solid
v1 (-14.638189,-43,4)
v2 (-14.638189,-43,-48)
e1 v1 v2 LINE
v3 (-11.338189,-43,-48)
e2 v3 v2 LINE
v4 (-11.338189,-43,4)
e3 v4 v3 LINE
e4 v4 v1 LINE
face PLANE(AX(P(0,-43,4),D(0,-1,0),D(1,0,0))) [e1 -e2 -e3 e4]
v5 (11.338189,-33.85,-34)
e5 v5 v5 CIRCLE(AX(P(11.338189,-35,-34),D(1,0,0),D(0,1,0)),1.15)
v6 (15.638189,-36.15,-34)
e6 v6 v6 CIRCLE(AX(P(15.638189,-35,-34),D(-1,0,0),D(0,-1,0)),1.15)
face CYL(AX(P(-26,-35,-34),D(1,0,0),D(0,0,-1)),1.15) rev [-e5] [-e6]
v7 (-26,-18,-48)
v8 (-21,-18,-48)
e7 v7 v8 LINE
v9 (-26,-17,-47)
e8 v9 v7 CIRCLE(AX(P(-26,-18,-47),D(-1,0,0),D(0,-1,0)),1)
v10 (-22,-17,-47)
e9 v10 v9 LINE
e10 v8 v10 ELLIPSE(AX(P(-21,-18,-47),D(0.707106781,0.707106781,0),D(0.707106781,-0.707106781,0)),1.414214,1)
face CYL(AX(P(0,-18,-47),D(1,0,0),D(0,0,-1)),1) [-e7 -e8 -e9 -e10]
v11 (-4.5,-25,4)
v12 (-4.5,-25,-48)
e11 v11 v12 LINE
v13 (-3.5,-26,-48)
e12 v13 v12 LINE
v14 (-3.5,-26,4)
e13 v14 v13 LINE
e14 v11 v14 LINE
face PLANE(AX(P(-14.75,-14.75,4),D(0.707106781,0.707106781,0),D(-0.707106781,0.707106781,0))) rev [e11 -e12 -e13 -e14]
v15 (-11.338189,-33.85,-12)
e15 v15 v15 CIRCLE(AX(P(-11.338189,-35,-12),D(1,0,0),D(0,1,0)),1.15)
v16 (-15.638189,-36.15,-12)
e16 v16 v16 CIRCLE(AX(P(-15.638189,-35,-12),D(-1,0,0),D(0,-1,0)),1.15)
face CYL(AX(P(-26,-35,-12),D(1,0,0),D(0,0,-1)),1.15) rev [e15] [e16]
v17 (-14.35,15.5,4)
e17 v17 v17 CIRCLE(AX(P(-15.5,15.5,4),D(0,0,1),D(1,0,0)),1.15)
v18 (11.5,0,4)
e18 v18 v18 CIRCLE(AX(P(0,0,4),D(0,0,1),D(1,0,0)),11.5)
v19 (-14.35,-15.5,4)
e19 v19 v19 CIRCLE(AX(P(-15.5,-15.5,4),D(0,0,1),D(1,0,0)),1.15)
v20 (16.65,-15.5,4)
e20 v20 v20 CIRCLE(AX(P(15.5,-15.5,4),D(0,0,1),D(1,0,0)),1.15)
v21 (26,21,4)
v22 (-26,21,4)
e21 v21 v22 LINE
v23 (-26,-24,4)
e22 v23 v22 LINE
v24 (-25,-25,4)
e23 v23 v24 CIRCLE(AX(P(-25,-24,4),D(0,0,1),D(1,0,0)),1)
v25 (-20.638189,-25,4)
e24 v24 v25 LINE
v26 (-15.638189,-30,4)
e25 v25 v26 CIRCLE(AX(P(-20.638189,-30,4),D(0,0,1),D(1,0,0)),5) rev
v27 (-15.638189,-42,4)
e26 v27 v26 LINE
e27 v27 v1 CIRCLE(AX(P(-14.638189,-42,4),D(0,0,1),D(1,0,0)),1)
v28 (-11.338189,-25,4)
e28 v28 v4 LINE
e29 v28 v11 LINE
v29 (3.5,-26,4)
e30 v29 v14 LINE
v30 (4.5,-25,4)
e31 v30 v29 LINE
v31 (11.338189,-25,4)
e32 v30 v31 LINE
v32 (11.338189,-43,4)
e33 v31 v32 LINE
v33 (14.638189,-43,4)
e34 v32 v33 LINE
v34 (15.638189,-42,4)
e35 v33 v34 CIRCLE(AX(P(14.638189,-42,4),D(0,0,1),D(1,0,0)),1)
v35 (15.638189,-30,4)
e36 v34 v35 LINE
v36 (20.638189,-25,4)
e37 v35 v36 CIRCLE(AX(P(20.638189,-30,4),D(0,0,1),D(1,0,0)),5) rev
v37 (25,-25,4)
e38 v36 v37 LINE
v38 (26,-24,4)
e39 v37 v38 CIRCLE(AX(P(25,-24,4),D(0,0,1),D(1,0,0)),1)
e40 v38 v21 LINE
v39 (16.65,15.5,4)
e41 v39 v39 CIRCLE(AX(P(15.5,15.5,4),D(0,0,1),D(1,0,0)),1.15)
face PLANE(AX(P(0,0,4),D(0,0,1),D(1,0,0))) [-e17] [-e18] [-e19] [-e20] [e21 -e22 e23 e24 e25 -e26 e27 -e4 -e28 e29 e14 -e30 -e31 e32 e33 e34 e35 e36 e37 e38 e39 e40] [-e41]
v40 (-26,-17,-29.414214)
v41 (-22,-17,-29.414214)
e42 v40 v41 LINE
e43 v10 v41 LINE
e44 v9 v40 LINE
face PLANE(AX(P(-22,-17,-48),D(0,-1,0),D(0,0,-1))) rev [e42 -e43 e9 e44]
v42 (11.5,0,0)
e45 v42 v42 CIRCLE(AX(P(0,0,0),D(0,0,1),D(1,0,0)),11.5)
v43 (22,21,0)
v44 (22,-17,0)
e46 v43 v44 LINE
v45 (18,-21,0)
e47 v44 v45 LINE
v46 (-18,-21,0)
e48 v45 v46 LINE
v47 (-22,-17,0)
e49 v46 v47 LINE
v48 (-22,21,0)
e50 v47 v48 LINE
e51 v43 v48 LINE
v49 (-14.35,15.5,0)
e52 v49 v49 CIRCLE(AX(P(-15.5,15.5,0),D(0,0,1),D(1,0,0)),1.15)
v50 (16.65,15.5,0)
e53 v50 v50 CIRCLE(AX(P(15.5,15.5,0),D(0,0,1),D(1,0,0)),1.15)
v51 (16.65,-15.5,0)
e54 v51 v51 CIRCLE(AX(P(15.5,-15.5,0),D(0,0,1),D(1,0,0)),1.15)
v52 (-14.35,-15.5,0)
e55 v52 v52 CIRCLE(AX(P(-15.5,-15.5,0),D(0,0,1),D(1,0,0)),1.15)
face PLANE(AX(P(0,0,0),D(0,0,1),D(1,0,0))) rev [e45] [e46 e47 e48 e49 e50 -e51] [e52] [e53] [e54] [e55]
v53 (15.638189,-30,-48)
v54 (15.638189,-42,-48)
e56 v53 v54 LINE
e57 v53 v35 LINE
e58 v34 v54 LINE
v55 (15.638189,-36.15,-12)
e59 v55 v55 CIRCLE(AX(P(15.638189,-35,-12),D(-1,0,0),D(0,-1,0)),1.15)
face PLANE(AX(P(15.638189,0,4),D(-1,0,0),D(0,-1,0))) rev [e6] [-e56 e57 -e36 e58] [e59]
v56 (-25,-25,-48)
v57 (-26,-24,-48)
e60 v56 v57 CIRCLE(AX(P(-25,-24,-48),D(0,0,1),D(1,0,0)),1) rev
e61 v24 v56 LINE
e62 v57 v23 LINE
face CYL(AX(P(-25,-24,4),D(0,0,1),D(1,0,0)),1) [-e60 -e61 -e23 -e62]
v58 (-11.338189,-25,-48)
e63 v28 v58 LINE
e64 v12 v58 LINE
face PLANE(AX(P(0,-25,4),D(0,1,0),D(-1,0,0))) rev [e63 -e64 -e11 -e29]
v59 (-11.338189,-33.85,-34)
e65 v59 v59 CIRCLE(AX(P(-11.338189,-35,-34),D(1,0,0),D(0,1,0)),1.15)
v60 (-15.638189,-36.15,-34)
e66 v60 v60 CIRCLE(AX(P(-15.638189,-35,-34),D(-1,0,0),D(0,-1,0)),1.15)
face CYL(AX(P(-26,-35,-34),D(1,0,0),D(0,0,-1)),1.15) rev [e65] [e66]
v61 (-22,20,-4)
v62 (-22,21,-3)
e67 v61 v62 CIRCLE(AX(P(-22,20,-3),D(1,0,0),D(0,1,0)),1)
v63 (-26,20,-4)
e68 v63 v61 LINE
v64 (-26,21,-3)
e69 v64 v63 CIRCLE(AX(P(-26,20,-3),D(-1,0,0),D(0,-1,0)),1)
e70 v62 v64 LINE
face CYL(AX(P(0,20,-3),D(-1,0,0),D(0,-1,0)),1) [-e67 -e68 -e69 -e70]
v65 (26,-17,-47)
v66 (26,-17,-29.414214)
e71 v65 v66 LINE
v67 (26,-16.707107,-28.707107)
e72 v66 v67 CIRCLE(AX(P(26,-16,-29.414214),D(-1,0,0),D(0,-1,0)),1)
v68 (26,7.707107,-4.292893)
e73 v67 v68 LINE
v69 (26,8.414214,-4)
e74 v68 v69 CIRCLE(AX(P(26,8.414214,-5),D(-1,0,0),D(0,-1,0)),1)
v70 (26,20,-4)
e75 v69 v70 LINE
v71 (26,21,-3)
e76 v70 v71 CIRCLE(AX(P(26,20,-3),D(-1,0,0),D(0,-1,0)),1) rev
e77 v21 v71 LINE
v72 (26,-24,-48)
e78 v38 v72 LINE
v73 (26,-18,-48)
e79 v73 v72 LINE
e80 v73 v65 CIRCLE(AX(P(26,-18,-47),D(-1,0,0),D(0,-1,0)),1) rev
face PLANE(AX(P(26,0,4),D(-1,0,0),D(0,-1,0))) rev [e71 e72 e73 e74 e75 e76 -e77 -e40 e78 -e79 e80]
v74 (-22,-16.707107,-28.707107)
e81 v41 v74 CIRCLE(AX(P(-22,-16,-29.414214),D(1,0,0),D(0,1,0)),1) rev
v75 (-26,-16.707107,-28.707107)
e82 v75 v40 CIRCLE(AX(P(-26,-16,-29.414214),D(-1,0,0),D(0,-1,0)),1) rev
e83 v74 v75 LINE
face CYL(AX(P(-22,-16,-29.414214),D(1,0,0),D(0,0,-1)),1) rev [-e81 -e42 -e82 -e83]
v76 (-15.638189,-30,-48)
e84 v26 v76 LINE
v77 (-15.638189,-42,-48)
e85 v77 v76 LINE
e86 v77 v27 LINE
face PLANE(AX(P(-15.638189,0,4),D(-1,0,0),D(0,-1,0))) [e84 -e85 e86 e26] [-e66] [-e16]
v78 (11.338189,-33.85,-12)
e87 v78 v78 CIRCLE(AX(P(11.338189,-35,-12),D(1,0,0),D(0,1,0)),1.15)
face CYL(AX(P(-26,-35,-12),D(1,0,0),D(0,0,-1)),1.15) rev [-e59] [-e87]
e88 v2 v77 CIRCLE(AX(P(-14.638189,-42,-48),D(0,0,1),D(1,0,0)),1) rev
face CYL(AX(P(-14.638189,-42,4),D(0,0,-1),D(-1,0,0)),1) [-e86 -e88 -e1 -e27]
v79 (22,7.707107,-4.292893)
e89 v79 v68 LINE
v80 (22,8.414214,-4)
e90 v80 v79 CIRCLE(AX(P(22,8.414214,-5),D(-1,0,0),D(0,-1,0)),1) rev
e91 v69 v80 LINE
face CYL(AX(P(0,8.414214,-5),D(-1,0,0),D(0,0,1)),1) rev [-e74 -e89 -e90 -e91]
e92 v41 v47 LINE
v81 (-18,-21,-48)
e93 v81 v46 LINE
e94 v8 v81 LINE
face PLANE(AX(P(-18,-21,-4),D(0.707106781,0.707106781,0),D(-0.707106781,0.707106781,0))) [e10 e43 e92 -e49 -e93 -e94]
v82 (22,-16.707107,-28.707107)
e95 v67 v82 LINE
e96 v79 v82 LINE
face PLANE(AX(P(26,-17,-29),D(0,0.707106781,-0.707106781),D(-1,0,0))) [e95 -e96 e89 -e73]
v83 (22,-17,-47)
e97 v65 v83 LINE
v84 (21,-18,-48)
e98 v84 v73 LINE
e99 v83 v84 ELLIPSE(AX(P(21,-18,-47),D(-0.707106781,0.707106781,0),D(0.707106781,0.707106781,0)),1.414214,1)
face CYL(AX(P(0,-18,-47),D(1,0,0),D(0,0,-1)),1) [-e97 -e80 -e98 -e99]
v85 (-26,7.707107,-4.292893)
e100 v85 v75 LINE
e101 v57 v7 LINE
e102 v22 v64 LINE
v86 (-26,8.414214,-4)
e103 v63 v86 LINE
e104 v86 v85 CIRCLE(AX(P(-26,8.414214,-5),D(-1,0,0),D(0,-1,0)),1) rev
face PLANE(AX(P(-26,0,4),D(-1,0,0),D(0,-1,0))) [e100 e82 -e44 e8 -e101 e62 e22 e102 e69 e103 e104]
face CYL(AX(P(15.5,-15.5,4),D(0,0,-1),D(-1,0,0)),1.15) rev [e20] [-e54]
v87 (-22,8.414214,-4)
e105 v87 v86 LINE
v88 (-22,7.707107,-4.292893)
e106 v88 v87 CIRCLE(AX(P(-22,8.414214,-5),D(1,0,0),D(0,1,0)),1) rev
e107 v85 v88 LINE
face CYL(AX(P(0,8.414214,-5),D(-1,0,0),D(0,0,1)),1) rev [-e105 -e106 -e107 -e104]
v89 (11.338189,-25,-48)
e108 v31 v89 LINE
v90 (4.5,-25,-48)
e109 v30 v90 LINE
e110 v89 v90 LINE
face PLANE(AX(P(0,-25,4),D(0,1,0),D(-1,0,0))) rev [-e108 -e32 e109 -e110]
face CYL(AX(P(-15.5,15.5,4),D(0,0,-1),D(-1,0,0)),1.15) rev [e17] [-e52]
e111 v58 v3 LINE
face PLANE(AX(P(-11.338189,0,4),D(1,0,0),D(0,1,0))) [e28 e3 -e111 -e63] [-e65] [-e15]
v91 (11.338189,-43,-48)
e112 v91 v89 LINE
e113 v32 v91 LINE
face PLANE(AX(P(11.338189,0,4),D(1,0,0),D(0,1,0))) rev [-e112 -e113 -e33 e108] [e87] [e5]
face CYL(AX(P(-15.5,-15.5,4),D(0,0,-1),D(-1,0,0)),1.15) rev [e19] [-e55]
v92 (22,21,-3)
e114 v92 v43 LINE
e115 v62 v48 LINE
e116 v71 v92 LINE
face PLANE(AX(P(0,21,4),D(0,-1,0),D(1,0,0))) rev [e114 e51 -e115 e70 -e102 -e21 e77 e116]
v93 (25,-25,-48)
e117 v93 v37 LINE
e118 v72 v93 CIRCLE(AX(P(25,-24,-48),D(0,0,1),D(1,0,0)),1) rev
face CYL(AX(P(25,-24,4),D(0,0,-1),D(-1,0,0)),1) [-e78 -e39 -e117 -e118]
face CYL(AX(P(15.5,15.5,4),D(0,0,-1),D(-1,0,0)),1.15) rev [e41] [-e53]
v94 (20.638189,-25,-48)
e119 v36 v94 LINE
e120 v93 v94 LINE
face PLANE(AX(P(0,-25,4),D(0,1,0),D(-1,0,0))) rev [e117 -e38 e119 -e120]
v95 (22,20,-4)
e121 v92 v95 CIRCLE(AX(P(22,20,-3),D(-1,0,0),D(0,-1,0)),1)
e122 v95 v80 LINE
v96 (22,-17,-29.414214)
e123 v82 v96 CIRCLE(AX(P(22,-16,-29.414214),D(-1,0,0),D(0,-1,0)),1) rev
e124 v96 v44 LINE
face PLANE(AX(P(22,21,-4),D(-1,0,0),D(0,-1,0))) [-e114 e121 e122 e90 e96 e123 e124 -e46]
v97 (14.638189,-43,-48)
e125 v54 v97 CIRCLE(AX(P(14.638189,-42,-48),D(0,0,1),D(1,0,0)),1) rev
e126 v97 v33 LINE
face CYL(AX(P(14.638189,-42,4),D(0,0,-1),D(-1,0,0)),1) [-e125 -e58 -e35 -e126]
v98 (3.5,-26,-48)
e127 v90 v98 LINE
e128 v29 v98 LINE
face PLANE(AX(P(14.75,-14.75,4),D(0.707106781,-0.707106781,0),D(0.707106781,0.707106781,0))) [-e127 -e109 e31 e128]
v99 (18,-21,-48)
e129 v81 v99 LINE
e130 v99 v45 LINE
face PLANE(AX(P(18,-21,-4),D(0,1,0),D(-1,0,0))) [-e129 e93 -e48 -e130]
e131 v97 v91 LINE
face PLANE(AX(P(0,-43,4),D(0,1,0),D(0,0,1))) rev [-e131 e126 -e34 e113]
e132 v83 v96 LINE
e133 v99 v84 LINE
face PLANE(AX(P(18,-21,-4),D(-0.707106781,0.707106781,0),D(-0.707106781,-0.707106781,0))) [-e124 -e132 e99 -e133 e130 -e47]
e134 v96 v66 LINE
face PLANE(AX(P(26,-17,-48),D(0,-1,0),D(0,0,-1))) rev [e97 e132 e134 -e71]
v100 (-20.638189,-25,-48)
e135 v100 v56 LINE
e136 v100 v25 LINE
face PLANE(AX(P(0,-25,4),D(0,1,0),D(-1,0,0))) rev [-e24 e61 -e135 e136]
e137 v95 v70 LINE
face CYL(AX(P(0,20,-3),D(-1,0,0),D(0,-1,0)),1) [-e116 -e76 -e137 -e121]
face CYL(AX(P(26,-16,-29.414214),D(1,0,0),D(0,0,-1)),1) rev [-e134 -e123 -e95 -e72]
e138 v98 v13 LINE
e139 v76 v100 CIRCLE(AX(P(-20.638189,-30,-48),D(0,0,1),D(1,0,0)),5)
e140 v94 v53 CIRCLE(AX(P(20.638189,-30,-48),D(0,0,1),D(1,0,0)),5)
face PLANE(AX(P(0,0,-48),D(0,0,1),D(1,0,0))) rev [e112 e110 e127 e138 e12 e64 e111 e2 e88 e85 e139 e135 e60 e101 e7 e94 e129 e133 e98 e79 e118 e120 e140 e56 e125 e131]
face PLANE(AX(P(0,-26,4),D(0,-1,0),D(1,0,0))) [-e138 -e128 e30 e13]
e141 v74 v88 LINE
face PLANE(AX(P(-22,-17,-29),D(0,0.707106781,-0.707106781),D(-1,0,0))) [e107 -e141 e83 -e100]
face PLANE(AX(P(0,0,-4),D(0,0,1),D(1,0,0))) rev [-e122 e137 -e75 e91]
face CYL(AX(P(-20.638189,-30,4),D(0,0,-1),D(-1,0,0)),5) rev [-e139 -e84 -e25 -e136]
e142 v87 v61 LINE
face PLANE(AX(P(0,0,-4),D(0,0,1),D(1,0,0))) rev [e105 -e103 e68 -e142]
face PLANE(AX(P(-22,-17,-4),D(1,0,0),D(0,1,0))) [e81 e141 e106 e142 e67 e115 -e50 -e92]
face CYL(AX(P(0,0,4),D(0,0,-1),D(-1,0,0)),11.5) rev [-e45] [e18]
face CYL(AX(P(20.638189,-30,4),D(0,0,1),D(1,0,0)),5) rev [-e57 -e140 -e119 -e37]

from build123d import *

# Parameters (mm, degrees)
SKETCH1_W               = 52
SKETCH1_H               = 46
SKETCH1_R               = 1.15
SKETCH1_R_2             = 11.5
SKETCH1_W_2             = 4.3
SKETCH1_H_2             = 18
BOSS_EXTRUDE1_DEPTH     = 4
BOSS_EXTRUDE2_DEPTH     = 4
BOSS_EXTRUDE3_DEPTH     = 44
CHAMFER1_SIZE           = 25
CUT_EXTRUDE1_DEPTH      = 70.491006612
CUT_EXTRUDE1_DEPTH_BACK = 70.491006612
SKETCH4_R               = 1.15
FILLET1_R               = 5
FILLET2_R               = 1


with BuildPart() as part:
    # Sketch1 → Boss-Extrude1 (new body)
    # profile 1 of 4: a face of its own
    with BuildSketch(Plane.XY):
        with Locations((0, -2)):
            Rectangle(SKETCH1_W, SKETCH1_H)
        with Locations((15.5, 15.5)):
            Circle(SKETCH1_R, mode=Mode.SUBTRACT)
        with Locations((15.5, -15.5)):
            Circle(SKETCH1_R, mode=Mode.SUBTRACT)
        with Locations((-15.5, -15.5)):
            Circle(SKETCH1_R, mode=Mode.SUBTRACT)
        with Locations((-15.5, 15.5)):
            Circle(SKETCH1_R, mode=Mode.SUBTRACT)
        Circle(SKETCH1_R_2, mode=Mode.SUBTRACT)
    # profile 2 of 4: a face of its own
    with BuildSketch(Plane.XY):
        with Locations((-13.488188518, -34)):
            Rectangle(SKETCH1_W_2, SKETCH1_H_2)
    # profile 3 of 4: a face of its own
    with BuildSketch(Plane.XY):
        with Locations((13.488188518, -34)):
            Rectangle(SKETCH1_W_2, SKETCH1_H_2)
    # profile 4 of 4: a face of its own
    with BuildSketch(Plane.XY):
        Polygon((3.5, -26), (4.5, -25), (-4.5, -25), (-3.5, -26), align=None)
    extrude(amount=BOSS_EXTRUDE1_DEPTH)

    # Sketch2 → Boss-Extrude2 (add)
    with BuildSketch(Plane.XY):
        Polygon((26, 21), (22, 21), (22, -17), (18, -21), (-18, -21), (-22, -17), (-22, 21), (-26, 21), (-26, -25), (-15.638188518, -25), (-15.638188518, -43), (-11.338188518, -43), (-11.338188518, -25), (-4.5, -25), (-3.5, -26), (3.5, -26), (4.5, -25), (11.338188518, -25), (11.338188518, -43), (15.638188518, -43), (15.638188518, -25), (26, -25), align=None)
    extrude(amount=-BOSS_EXTRUDE2_DEPTH)

    # Sketch3 → Boss-Extrude3 (add)
    with BuildSketch(Plane(origin=(0, 0, -4), x_dir=(-1, 0, 0), z_dir=(0, 0, -1))):
        Polygon((-26, -25), (-26, -17), (-22, -17), (-18, -21), (18, -21), (22, -17), (26, -17), (26, -25), (15.638188518, -25), (15.638188518, -43), (11.338188518, -43), (11.338188518, -25), (4.5, -25), (3.5, -26), (-3.5, -26), (-4.5, -25), (-11.338188518, -25), (-11.338188518, -43), (-15.638188518, -43), (-15.638188518, -25), align=None)
    extrude(amount=BOSS_EXTRUDE3_DEPTH)

    # Chamfer1
    chamfer1_edges = [part.edges().sort_by_distance(p)[0] for p in [
        (-24, -17, -4),
        (24, -17, -4),
    ]]
    chamfer(chamfer1_edges, length=CHAMFER1_SIZE)

    # Sketch4 → Cut-Extrude1 (cut, two sides: drawn at the far end of the back side and taken through both)
    with BuildSketch(Plane(origin=(0, 0, 0), x_dir=(0, 0, -1), z_dir=(1, 0, 0)).offset(-CUT_EXTRUDE1_DEPTH_BACK)):
        with Locations(Location((34, -35, 0), (0, 0, 270))):
            Circle(SKETCH4_R)
        with Locations(Location((12, -35, 0), (0, 0, 270))):
            Circle(SKETCH4_R)
    extrude(amount=CUT_EXTRUDE1_DEPTH + CUT_EXTRUDE1_DEPTH_BACK, mode=Mode.SUBTRACT)

    # Fillet1
    fillet1_edges = [part.edges().sort_by_distance(p)[0] for p in [
        (15.638188518, -25, -22),
        (-15.638188518, -25, -22),
    ]]
    fillet(fillet1_edges, radius=FILLET1_R)

    # Fillet2
    # the kernel refuses this fillet: 1 mm, written as the material it adds along each edge
    with BuildSketch(Plane(origin=(-22, -17, -29), x_dir=(0, 0.7071067811865475, 0.7071067811865475), z_dir=(-1, 0, 0))) as fillet2_piece_1_section:
        with BuildLine():
            CenterArc((FILLET2_R * 0.414213562373, FILLET2_R), FILLET2_R, 225, 45)
            Line((-FILLET2_R * 0.292893218813, FILLET2_R * 0.292893218813), (0, 0))
            Line((0, 0), (FILLET2_R * 0.414213562373, 0))
        make_face()
    fillet2_piece_1 = extrude(amount=4, mode=Mode.PRIVATE)
    fillet2_piece_1 = split(fillet2_piece_1, bisect_by=Plane(origin=(-22.109509858, -16.890490142, -28.87205582), z_dir=(0.7071067811865658, 0.7071067811865294, 0)), keep=Keep.TOP, mode=Mode.PRIVATE)
    add(fillet2_piece_1)
    with BuildSketch(Plane(origin=(-22, -17, -29), x_dir=(0, 0.7071067811865475, 0.7071067811865475), z_dir=(-1, 0, 0))) as fillet2_piece_2_section:
        with BuildLine():
            CenterArc((FILLET2_R * 0.414213562373, FILLET2_R), FILLET2_R, 225, 45)
            Line((-FILLET2_R * 0.292893218813, FILLET2_R * 0.292893218813), (0, 0))
            Line((0, 0), (FILLET2_R * 0.414213562373, 0))
        make_face()
    fillet2_piece_2 = extrude(amount=4, mode=Mode.PRIVATE)
    fillet2_piece_2 = split(fillet2_piece_2, bisect_by=Plane(origin=(-23.045900005, -15.954099995, -29.028101444), z_dir=(-0.7071067811865658, -0.7071067811865294, 0)), keep=Keep.TOP, mode=Mode.PRIVATE)
    add(fillet2_piece_2)
    with BuildSketch(Plane(origin=(-22, 8, -4), x_dir=(0, 1, 0), z_dir=(-1, 0, 0))) as fillet2_piece_3:
        with BuildLine():
            CenterArc((FILLET2_R * 0.414213562373, FILLET2_R), FILLET2_R, 225, 45)
            Line((-FILLET2_R * 0.292893218813, FILLET2_R * 0.292893218813), (0, 0))
            Line((0, 0), (FILLET2_R * 0.414213562373, 0))
        make_face()
    extrude(amount=4)
    with BuildSketch(Plane(origin=(26, -17, -29), x_dir=(0, 0, -1), z_dir=(-1, 0, 0))) as fillet2_piece_4_section:
        with BuildLine():
            CenterArc((FILLET2_R * 0.414213562373, -FILLET2_R), FILLET2_R, 90, 45)
            Line((-FILLET2_R * 0.292893218813, -FILLET2_R * 0.292893218813), (0, 0))
            Line((0, 0), (FILLET2_R * 0.414213562373, 0))
        make_face()
    fillet2_piece_4 = extrude(amount=4, mode=Mode.PRIVATE)
    fillet2_piece_4 = split(fillet2_piece_4, bisect_by=Plane(origin=(23.045900005, -15.954099995, -29.028101444), z_dir=(0.7071067811865454, -0.7071067811865498, 0)), keep=Keep.TOP, mode=Mode.PRIVATE)
    add(fillet2_piece_4)
    with BuildSketch(Plane(origin=(26, -17, -29), x_dir=(0, 0, -1), z_dir=(-1, 0, 0))) as fillet2_piece_5_section:
        with BuildLine():
            CenterArc((FILLET2_R * 0.414213562373, -FILLET2_R), FILLET2_R, 90, 45)
            Line((-FILLET2_R * 0.292893218813, -FILLET2_R * 0.292893218813), (0, 0))
            Line((0, 0), (FILLET2_R * 0.414213562373, 0))
        make_face()
    fillet2_piece_5 = extrude(amount=4, mode=Mode.PRIVATE)
    fillet2_piece_5 = split(fillet2_piece_5, bisect_by=Plane(origin=(22.109509858, -16.890490142, -28.87205582), z_dir=(-0.7071067811865454, 0.7071067811865498, 0)), keep=Keep.TOP, mode=Mode.PRIVATE)
    add(fillet2_piece_5)
    with BuildSketch(Plane(origin=(26, 8, -4), x_dir=(0, -0.7071067811865475, -0.7071067811865475), z_dir=(-1, 0, 0))) as fillet2_piece_6:
        with BuildLine():
            CenterArc((FILLET2_R * 0.414213562373, -FILLET2_R), FILLET2_R, 90, 45)
            Line((-FILLET2_R * 0.292893218813, -FILLET2_R * 0.292893218813), (0, 0))
            Line((0, 0), (FILLET2_R * 0.414213562373, 0))
        make_face()
    extrude(amount=4)
    # the kernel refuses this fillet: 1 mm, written as the material it takes off along each edge
    with BuildSketch(Plane(origin=(-19.5, -17, -48), x_dir=(0, -1, 0), z_dir=(-1, 0, 0)), Plane(origin=(-19.5, 21, -4), x_dir=(0, -1, 0), z_dir=(-1, 0, 0)), Plane(origin=(28.5, 21, -4), x_dir=(0, -1, 0), z_dir=(-1, 0, 0))) as fillet2_2_piece_1:
        with BuildLine():
            CenterArc((FILLET2_R, FILLET2_R), FILLET2_R, 180, 90)
            Line((0, FILLET2_R), (0, 0))
            Line((0, 0), (FILLET2_R, 0))
        make_face()
    extrude(amount=9, mode=Mode.SUBTRACT)
    with BuildSketch(Plane(origin=(28.5, -17, -48), x_dir=(0, 0, 1), z_dir=(-1, 0, 0))) as fillet2_2_piece_2:
        with BuildLine():
            CenterArc((FILLET2_R, -FILLET2_R), FILLET2_R, 90, 90)
            Line((0, -FILLET2_R), (0, 0))
            Line((0, 0), (FILLET2_R, 0))
        make_face()
    extrude(amount=9, mode=Mode.SUBTRACT)
    with BuildSketch(Plane(origin=(26, -25, 6.5), x_dir=(0, 1, 0), z_dir=(0, 0, -1)), Plane(origin=(-15.638188518, -43, 6.5), x_dir=(1, 0, 0), z_dir=(0, 0, -1))) as fillet2_2_piece_3:
        with BuildLine():
            CenterArc((FILLET2_R, -FILLET2_R), FILLET2_R, 90, 90)
            Line((0, -FILLET2_R), (0, 0))
            Line((0, 0), (FILLET2_R, 0))
        make_face()
    extrude(amount=57, mode=Mode.SUBTRACT)
    with BuildSketch(Plane(origin=(15.638188518, -43, 6.5), x_dir=(-1, 0, 0), z_dir=(0, 0, -1)), Plane(origin=(-26, -25, -50.5), x_dir=(1, 0, 0), z_dir=(0, 0, 1))) as fillet2_2_piece_4:
        with BuildLine():
            CenterArc((FILLET2_R, FILLET2_R), FILLET2_R, 180, 90)
            Line((0, FILLET2_R), (0, 0))
            Line((0, 0), (FILLET2_R, 0))
        make_face()
    extrude(amount=57, mode=Mode.SUBTRACT)


solid = part.part
